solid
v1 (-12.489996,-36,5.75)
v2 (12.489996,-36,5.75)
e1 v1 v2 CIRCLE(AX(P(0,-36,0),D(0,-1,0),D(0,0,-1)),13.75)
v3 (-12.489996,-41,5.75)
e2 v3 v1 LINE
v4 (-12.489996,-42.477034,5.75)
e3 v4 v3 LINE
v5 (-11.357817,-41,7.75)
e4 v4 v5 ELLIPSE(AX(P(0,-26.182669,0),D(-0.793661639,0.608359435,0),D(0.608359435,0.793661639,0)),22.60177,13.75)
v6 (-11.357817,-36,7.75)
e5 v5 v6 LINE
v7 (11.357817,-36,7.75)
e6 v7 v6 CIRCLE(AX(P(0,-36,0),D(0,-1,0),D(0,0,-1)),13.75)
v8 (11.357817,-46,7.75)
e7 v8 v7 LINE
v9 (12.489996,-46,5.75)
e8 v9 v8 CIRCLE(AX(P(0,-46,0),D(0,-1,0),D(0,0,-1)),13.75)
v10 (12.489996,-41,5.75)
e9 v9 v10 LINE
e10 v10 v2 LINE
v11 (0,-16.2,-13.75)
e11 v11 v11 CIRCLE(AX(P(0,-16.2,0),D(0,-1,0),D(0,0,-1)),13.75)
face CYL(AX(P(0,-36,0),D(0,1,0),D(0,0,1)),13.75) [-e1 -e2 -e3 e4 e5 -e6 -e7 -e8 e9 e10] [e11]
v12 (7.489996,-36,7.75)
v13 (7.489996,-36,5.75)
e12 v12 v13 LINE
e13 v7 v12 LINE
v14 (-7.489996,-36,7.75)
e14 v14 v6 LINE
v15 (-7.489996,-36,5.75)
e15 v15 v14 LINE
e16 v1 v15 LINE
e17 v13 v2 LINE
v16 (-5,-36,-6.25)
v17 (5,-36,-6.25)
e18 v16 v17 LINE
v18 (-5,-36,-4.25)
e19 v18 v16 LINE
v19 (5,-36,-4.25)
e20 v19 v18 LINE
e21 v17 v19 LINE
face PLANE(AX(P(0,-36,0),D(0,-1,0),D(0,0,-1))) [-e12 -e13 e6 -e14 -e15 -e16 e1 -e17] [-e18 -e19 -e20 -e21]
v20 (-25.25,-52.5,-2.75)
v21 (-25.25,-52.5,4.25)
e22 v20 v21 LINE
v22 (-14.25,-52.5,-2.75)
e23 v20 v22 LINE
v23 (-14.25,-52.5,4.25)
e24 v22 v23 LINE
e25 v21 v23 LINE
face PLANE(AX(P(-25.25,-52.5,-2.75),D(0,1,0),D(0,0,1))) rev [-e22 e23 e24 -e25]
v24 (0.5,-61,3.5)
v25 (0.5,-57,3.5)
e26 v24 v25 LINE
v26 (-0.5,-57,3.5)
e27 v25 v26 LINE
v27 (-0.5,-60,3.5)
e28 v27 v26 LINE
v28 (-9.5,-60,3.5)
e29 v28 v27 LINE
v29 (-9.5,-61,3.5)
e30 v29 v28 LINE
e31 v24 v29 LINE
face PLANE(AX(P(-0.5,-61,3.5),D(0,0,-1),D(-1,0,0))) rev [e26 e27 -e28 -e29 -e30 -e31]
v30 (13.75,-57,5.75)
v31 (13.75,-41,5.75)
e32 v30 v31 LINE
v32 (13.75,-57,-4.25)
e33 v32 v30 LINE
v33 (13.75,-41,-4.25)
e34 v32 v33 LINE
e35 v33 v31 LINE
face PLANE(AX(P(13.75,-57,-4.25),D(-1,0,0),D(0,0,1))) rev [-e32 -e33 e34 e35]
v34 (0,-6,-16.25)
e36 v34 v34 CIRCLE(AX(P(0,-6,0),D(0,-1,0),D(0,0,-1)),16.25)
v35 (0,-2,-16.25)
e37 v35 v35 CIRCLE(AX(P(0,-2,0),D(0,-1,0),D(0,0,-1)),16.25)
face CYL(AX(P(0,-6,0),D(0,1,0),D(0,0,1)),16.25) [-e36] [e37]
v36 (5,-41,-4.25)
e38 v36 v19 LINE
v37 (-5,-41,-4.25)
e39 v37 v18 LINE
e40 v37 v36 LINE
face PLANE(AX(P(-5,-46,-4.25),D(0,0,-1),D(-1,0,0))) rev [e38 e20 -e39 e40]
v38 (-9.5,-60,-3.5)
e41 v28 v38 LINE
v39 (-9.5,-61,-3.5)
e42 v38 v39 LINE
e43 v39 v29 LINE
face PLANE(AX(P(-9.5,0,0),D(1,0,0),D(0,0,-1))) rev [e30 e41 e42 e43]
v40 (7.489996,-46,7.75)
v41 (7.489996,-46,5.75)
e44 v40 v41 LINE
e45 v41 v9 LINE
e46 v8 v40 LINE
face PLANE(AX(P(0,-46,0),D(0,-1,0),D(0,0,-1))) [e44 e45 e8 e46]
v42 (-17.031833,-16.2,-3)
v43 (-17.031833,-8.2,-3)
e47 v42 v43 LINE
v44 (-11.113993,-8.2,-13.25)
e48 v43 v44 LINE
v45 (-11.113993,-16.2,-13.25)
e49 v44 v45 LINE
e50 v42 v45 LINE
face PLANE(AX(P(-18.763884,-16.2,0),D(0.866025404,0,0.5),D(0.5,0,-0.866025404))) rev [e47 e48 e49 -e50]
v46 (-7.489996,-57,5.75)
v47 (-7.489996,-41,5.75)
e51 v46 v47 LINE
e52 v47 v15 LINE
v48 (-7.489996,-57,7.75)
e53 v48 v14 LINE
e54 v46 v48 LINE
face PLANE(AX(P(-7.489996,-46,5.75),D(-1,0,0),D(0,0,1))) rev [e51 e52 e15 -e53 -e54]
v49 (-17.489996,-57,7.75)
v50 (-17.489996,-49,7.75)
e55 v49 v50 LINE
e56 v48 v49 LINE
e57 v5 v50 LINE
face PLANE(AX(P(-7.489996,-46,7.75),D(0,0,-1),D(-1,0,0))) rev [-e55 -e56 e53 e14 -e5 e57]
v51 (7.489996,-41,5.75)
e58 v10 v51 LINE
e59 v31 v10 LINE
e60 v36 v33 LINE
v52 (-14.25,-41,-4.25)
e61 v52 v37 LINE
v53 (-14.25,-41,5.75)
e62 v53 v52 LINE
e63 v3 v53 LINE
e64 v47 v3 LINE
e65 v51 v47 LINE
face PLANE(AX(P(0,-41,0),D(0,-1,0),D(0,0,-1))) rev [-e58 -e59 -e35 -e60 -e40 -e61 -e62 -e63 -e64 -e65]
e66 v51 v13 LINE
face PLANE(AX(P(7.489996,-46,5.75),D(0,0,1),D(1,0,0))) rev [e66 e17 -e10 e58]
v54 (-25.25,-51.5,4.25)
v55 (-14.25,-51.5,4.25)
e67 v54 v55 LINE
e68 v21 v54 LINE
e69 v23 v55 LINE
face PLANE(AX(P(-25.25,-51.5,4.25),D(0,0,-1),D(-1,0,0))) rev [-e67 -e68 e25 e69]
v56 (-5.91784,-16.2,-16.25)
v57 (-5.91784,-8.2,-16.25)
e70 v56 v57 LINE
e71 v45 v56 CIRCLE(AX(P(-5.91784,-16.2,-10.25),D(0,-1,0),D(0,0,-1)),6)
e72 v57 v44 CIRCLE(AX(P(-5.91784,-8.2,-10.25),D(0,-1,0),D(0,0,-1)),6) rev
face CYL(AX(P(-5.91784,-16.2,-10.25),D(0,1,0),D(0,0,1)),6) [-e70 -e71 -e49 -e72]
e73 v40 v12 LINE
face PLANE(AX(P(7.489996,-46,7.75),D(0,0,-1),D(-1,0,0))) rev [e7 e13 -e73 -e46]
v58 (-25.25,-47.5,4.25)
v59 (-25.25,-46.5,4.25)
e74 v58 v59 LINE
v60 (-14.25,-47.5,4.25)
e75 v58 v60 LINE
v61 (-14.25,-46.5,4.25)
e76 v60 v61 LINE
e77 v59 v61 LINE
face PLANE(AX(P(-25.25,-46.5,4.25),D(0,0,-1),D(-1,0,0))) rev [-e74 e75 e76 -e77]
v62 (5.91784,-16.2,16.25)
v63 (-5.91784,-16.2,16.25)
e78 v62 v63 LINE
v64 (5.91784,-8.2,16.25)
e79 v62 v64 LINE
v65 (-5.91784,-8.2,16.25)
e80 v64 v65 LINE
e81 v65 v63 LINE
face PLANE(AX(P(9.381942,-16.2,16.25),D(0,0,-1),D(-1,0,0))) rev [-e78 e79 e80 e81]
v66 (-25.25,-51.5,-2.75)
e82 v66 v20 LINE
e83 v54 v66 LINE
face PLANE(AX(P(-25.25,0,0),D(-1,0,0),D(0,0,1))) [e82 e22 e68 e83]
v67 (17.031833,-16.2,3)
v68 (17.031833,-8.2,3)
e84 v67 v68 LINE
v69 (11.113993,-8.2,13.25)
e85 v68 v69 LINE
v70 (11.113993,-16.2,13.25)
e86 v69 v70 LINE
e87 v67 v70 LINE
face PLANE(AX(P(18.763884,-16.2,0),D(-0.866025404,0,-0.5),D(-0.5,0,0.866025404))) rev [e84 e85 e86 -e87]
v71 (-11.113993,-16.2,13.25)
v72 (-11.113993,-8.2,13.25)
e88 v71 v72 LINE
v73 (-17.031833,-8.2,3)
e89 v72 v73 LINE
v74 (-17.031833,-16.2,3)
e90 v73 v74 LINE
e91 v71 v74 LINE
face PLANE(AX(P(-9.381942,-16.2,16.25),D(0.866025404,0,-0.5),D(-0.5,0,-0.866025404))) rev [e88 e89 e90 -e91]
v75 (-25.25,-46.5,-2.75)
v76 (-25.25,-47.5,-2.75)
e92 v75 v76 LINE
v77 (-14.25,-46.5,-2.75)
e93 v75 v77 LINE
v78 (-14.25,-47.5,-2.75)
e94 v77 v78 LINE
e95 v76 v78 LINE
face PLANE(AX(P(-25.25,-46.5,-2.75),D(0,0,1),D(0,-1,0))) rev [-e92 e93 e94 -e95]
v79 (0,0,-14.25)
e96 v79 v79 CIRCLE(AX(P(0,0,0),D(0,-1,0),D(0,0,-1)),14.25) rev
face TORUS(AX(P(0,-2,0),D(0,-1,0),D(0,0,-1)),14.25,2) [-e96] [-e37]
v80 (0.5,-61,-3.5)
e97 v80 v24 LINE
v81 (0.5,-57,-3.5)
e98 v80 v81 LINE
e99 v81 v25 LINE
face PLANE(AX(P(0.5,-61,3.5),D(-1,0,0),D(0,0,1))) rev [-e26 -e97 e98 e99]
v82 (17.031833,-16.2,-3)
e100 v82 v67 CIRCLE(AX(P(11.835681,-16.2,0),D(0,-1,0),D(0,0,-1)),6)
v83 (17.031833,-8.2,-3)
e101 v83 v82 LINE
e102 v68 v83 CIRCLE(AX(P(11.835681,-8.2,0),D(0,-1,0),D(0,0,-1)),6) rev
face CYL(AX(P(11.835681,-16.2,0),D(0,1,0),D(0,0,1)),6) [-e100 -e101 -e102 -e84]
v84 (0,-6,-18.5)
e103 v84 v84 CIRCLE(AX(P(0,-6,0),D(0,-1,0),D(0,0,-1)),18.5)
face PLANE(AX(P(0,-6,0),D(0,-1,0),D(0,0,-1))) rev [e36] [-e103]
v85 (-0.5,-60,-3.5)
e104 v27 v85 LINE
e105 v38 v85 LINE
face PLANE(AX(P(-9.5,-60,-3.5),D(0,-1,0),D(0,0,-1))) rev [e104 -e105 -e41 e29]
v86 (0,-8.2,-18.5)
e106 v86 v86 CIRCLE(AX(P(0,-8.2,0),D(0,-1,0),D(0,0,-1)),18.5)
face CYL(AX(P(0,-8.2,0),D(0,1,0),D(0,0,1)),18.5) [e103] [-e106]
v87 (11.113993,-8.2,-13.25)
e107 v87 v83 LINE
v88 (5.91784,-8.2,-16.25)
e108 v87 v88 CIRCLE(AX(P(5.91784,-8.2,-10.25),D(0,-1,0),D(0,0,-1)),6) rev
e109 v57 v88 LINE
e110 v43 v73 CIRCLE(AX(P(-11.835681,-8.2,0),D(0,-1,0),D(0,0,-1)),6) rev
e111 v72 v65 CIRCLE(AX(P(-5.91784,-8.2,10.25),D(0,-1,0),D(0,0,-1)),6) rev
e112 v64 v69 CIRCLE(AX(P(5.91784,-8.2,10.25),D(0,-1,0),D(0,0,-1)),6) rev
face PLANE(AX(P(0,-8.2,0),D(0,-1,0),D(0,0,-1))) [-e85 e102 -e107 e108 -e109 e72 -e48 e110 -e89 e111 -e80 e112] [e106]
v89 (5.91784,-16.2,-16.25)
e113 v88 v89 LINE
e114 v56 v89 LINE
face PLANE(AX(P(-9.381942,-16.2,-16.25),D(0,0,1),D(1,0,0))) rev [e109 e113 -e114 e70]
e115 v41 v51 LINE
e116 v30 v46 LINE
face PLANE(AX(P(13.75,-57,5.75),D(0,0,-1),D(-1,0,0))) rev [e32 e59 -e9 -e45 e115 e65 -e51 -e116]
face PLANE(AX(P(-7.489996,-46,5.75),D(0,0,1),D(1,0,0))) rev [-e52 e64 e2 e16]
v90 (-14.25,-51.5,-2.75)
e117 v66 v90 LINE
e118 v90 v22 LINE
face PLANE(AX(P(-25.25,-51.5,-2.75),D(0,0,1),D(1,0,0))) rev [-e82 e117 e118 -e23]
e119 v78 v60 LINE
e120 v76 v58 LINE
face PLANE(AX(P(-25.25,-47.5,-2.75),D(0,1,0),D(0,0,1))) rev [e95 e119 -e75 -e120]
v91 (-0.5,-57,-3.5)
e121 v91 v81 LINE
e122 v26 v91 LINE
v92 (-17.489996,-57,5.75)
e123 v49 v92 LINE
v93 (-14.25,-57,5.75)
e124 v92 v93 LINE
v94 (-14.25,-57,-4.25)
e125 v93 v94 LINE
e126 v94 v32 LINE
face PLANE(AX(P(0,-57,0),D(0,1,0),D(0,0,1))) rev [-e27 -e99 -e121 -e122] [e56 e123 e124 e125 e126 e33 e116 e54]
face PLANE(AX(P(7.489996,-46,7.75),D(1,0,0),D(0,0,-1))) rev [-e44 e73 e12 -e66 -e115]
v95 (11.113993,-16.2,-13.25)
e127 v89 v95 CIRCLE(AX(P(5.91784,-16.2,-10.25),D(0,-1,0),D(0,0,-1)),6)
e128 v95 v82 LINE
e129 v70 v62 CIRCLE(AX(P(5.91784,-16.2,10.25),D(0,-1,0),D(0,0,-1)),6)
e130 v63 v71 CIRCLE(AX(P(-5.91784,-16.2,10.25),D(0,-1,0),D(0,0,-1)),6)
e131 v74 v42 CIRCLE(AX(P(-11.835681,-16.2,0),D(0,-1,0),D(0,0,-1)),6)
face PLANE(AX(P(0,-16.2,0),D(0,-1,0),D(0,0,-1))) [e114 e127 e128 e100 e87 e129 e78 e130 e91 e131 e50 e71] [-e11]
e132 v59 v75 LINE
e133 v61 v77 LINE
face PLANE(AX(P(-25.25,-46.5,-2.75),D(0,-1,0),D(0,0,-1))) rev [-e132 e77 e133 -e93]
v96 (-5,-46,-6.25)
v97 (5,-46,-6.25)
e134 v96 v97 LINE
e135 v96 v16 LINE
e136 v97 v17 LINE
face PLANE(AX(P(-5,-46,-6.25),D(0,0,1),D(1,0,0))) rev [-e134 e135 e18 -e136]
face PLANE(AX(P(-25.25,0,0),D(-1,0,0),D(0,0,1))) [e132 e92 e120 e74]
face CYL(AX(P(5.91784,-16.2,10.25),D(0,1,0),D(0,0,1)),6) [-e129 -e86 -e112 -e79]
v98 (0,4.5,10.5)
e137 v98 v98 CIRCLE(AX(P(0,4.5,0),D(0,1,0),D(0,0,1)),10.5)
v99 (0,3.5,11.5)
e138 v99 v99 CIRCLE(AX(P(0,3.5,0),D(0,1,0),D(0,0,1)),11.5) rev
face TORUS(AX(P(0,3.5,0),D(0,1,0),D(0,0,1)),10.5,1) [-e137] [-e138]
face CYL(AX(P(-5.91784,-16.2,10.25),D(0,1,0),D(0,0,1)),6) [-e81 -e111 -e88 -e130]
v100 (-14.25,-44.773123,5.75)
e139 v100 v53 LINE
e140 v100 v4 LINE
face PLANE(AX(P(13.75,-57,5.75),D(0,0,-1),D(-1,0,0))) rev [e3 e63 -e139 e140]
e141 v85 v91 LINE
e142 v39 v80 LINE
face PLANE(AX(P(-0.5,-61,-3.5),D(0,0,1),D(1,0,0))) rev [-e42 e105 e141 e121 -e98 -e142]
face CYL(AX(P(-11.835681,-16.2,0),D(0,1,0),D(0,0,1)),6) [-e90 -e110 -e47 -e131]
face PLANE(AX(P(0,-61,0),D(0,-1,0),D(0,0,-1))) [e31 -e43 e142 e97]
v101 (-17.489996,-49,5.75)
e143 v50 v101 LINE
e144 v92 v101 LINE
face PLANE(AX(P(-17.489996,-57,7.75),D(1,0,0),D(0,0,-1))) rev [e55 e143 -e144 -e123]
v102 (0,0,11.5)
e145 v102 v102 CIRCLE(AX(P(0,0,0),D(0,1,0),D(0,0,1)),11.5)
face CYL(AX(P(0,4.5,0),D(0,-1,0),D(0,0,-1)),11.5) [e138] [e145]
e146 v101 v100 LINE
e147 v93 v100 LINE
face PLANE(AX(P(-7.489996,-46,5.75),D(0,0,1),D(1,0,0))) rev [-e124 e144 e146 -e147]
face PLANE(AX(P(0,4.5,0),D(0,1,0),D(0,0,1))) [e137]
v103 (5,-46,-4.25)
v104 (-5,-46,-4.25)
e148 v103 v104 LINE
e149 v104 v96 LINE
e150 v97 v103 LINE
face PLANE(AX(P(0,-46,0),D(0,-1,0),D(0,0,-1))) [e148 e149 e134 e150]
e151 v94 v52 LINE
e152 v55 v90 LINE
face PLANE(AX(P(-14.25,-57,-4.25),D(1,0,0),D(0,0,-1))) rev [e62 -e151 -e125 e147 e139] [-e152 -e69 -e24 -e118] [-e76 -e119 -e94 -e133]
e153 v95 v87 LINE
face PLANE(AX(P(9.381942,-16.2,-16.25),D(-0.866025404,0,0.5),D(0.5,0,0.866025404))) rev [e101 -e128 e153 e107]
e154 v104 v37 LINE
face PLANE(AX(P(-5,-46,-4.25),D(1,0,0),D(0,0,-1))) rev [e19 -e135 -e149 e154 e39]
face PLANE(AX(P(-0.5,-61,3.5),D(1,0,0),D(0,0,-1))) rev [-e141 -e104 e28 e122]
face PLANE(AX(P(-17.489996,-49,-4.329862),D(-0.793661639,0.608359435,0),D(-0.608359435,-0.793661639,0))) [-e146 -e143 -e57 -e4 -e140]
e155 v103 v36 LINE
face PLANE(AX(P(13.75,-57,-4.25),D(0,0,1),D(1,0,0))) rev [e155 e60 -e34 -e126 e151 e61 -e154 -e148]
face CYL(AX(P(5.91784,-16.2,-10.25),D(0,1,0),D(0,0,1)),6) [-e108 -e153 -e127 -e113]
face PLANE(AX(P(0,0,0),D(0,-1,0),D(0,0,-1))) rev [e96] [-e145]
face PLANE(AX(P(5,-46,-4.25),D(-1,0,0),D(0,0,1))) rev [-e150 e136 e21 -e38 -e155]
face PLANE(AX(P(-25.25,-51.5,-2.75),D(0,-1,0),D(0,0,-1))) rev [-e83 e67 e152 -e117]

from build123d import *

# Parameters (mm, degrees)
CROQUIS1_R               = 11.5
SALIENTE_EXTRUIR1_DEPTH  = 4.5
REDONDEO1_R              = 1
CROQUIS2_R               = 16.25
SALIENTE_EXTRUIR2_DEPTH  = 6
REDONDEO2_R              = 2
CROQUIS3_R               = 13.75
SALIENTE_EXTRUIR3_DEPTH  = 30
CROQUIS5_R               = 18.5
SALIENTE_EXTRUIR4_DEPTH  = 2.2
SALIENTE_EXTRUIR5_DEPTH  = 8
REDONDEO3_R              = 6
CROQUIS7_W               = 10
CROQUIS7_H               = 2
SALIENTE_EXTRUIR6_DEPTH  = 10
CROQUIS8_W               = 10
CROQUIS8_H               = 2
SALIENTE_EXTRUIR7_DEPTH  = 11
SALIENTE_EXTRUIR8_DEPTH  = 2
CORTAR_EXTRUIR1_DEPTH    = 66.424097243
CROQUIS12_W              = 28
CROQUIS12_H              = 10
SALIENTE_EXTRUIR9_DEPTH  = 16
CROQUIS13_W              = 1
CROQUIS13_H              = 7
SALIENTE_EXTRUIR10_DEPTH = 4
CROQUIS14_W              = 7
CROQUIS14_H              = 1
SALIENTE_EXTRUIR11_DEPTH = 9
CROQUIS15_W              = 7
CROQUIS15_H              = 1
SALIENTE_EXTRUIR12_DEPTH = 11


with BuildPart() as part:
    # Croquis1 → Saliente-Extruir1 (new body)
    with BuildSketch(Plane(origin=(0, 0, 0), x_dir=(1, 0, 0), z_dir=(0, 1, 0))):
        with Locations(Location((0, 0, 0), (0, 0, 270))):
            Circle(CROQUIS1_R)
    extrude(amount=SALIENTE_EXTRUIR1_DEPTH)

    # Redondeo1
    redondeo1_edges = [part.edges().sort_by_distance(p)[0] for p in [
        (0, 4.5, -11.5),
    ]]
    fillet(redondeo1_edges, radius=REDONDEO1_R)

    # Croquis2 → Saliente-Extruir2 (add)
    with BuildSketch(Plane.XZ):
        with Locations(Location((0, 0, 0), (0, 0, 270))):
            Circle(CROQUIS2_R)
    extrude(amount=SALIENTE_EXTRUIR2_DEPTH)

    # Redondeo2
    redondeo2_edges = [part.edges().sort_by_distance(p)[0] for p in [
        (0, 0, 16.25),
    ]]
    fillet(redondeo2_edges, radius=REDONDEO2_R)

    # Croquis3 → Saliente-Extruir3 (add)
    with BuildSketch(Plane.XZ.offset(6)):
        with Locations(Location((0, 0, 0), (0, 0, 270))):
            Circle(CROQUIS3_R)
    extrude(amount=SALIENTE_EXTRUIR3_DEPTH)

    # Croquis5 → Saliente-Extruir4 (add)
    with BuildSketch(Plane.XZ.offset(6)):
        with Locations(Location((0, 0, 0), (0, 0, 270))):
            Circle(CROQUIS5_R)
    extrude(amount=SALIENTE_EXTRUIR4_DEPTH)

    # Croquis6 → Saliente-Extruir5 (add)
    with BuildSketch(Plane.XZ.offset(8.2)):
        Polygon((18.763883749, 0), (9.381941874, 16.25), (-9.381941874, 16.25), (-18.763883749, 0), (-9.381941874, -16.25), (9.381941874, -16.25), align=None)
    extrude(amount=SALIENTE_EXTRUIR5_DEPTH)

    # Redondeo3
    # the kernel refuses this fillet: 6 mm, written as the material it takes off along each edge
    with BuildSketch(Plane(origin=(9.381941874, -8.2, -16.25), x_dir=(-1, 0, 0), z_dir=(0, -1, 0))) as redondeo3_piece_1:
        with BuildLine():
            CenterArc((REDONDEO3_R * 0.57735026919, -REDONDEO3_R), REDONDEO3_R, 90, 60)
            Line((-REDONDEO3_R * 0.288675134595, -REDONDEO3_R * 0.5), (0, 0))
            Line((0, 0), (REDONDEO3_R * 0.57735026919, 0))
        make_face()
    extrude(amount=16.660254038, mode=Mode.SUBTRACT)
    with BuildSketch(Plane(origin=(18.763883749, -8.2, 0), x_dir=(-0.4999999999999997, 0, 0.8660254037844387), z_dir=(0, -1, 0)), Plane(origin=(9.381941874, -8.2, 16.25), x_dir=(-1, 0, 0), z_dir=(0, -1, 0)), Plane(origin=(-9.381941874, -8.2, 16.25), x_dir=(-0.5, 0, -0.8660254037844386), z_dir=(0, -1, 0)), Plane(origin=(-18.763883749, -8.2, 0), x_dir=(0.4999999999999992, 0, -0.866025403784439), z_dir=(0, -1, 0)), Plane(origin=(-9.381941874, -8.2, -16.25), x_dir=(1, 0, 0), z_dir=(0, -1, 0))) as redondeo3_piece_2:
        with BuildLine():
            CenterArc((REDONDEO3_R * 0.57735026919, REDONDEO3_R), REDONDEO3_R, 210, 60)
            Line((-REDONDEO3_R * 0.288675134595, REDONDEO3_R * 0.5), (0, 0))
            Line((0, 0), (REDONDEO3_R * 0.57735026919, 0))
        make_face()
    extrude(amount=16.660254038, mode=Mode.SUBTRACT)

    # Croquis7 → Saliente-Extruir6 (add)
    with BuildSketch(Plane.XZ.offset(36)):
        with BuildLine():
            Line((-7.489995997, 5.75), (-12.489995997, 5.75))
            ThreePointArc((-12.489995997, 5.75), (-11.965765437, 6.773696), (-11.357816692, 7.75))
            Line((-11.357816692, 7.75), (-7.489995997, 7.75))
            Line((-7.489995997, 7.75), (-7.489995997, 5.75))
        make_face()
        with BuildLine():
            Line((7.489995997, 7.75), (11.357816692, 7.75))
            ThreePointArc((11.357816692, 7.75), (11.965765437, 6.773696), (12.489995997, 5.75))
            Line((12.489995997, 5.75), (7.489995997, 5.75))
            Line((7.489995997, 5.75), (7.489995997, 7.75))
        make_face()
        with Locations((0, -5.25)):
            Rectangle(CROQUIS7_W, CROQUIS7_H)
    extrude(amount=SALIENTE_EXTRUIR6_DEPTH)

    # Croquis8 → Saliente-Extruir7 (add)
    with BuildSketch(Plane.XZ.offset(46)):
        with Locations((-12.489995997, 6.75)):
            Rectangle(CROQUIS8_W, CROQUIS8_H)
    extrude(amount=SALIENTE_EXTRUIR7_DEPTH)

    # Croquis9 → Saliente-Extruir8 (add)
    with BuildSketch(Plane.XY.offset(7.75)):
        Polygon((-17.489995997, -49), (-11.357816692, -41), (-11.357816692, -49), align=None)
    extrude(amount=-SALIENTE_EXTRUIR8_DEPTH)

    # Croquis11 → Cortar-Extruir1 (cut, through all)
    with BuildSketch(Plane.XY.offset(7.75)):
        Polygon((-15.190428757, -46), (-17.489995997, -49), (-17.489995997, -46), align=None)
    extrude(amount=-CORTAR_EXTRUIR1_DEPTH, mode=Mode.SUBTRACT)

    # Croquis12 → Saliente-Extruir9 (add)
    with BuildSketch(Plane(origin=(0, -41, 0), x_dir=(-1, 0, 0), z_dir=(0, -1, 0))):
        with Locations((0.25, -0.75)):
            Rectangle(CROQUIS12_W, CROQUIS12_H)
    extrude(amount=SALIENTE_EXTRUIR9_DEPTH)

    # Croquis13 → Saliente-Extruir10 (add)
    with BuildSketch(Plane.XZ.offset(57)):
        Rectangle(CROQUIS13_W, CROQUIS13_H)
    extrude(amount=SALIENTE_EXTRUIR10_DEPTH)

    # Croquis14 → Saliente-Extruir11 (add)
    with BuildSketch(Plane.ZY.offset(0.5)):
        with Locations((0, -60.5)):
            Rectangle(CROQUIS14_W, CROQUIS14_H)
    extrude(amount=SALIENTE_EXTRUIR11_DEPTH)

    # Croquis15 → Saliente-Extruir12 (add)
    with BuildSketch(Plane.ZY.offset(14.25)):
        with Locations((0.75, -47)):
            Rectangle(CROQUIS15_W, CROQUIS15_H)
        with Locations((0.75, -52)):
            Rectangle(CROQUIS15_W, CROQUIS15_H)
    extrude(amount=SALIENTE_EXTRUIR12_DEPTH)


solid = part.part
